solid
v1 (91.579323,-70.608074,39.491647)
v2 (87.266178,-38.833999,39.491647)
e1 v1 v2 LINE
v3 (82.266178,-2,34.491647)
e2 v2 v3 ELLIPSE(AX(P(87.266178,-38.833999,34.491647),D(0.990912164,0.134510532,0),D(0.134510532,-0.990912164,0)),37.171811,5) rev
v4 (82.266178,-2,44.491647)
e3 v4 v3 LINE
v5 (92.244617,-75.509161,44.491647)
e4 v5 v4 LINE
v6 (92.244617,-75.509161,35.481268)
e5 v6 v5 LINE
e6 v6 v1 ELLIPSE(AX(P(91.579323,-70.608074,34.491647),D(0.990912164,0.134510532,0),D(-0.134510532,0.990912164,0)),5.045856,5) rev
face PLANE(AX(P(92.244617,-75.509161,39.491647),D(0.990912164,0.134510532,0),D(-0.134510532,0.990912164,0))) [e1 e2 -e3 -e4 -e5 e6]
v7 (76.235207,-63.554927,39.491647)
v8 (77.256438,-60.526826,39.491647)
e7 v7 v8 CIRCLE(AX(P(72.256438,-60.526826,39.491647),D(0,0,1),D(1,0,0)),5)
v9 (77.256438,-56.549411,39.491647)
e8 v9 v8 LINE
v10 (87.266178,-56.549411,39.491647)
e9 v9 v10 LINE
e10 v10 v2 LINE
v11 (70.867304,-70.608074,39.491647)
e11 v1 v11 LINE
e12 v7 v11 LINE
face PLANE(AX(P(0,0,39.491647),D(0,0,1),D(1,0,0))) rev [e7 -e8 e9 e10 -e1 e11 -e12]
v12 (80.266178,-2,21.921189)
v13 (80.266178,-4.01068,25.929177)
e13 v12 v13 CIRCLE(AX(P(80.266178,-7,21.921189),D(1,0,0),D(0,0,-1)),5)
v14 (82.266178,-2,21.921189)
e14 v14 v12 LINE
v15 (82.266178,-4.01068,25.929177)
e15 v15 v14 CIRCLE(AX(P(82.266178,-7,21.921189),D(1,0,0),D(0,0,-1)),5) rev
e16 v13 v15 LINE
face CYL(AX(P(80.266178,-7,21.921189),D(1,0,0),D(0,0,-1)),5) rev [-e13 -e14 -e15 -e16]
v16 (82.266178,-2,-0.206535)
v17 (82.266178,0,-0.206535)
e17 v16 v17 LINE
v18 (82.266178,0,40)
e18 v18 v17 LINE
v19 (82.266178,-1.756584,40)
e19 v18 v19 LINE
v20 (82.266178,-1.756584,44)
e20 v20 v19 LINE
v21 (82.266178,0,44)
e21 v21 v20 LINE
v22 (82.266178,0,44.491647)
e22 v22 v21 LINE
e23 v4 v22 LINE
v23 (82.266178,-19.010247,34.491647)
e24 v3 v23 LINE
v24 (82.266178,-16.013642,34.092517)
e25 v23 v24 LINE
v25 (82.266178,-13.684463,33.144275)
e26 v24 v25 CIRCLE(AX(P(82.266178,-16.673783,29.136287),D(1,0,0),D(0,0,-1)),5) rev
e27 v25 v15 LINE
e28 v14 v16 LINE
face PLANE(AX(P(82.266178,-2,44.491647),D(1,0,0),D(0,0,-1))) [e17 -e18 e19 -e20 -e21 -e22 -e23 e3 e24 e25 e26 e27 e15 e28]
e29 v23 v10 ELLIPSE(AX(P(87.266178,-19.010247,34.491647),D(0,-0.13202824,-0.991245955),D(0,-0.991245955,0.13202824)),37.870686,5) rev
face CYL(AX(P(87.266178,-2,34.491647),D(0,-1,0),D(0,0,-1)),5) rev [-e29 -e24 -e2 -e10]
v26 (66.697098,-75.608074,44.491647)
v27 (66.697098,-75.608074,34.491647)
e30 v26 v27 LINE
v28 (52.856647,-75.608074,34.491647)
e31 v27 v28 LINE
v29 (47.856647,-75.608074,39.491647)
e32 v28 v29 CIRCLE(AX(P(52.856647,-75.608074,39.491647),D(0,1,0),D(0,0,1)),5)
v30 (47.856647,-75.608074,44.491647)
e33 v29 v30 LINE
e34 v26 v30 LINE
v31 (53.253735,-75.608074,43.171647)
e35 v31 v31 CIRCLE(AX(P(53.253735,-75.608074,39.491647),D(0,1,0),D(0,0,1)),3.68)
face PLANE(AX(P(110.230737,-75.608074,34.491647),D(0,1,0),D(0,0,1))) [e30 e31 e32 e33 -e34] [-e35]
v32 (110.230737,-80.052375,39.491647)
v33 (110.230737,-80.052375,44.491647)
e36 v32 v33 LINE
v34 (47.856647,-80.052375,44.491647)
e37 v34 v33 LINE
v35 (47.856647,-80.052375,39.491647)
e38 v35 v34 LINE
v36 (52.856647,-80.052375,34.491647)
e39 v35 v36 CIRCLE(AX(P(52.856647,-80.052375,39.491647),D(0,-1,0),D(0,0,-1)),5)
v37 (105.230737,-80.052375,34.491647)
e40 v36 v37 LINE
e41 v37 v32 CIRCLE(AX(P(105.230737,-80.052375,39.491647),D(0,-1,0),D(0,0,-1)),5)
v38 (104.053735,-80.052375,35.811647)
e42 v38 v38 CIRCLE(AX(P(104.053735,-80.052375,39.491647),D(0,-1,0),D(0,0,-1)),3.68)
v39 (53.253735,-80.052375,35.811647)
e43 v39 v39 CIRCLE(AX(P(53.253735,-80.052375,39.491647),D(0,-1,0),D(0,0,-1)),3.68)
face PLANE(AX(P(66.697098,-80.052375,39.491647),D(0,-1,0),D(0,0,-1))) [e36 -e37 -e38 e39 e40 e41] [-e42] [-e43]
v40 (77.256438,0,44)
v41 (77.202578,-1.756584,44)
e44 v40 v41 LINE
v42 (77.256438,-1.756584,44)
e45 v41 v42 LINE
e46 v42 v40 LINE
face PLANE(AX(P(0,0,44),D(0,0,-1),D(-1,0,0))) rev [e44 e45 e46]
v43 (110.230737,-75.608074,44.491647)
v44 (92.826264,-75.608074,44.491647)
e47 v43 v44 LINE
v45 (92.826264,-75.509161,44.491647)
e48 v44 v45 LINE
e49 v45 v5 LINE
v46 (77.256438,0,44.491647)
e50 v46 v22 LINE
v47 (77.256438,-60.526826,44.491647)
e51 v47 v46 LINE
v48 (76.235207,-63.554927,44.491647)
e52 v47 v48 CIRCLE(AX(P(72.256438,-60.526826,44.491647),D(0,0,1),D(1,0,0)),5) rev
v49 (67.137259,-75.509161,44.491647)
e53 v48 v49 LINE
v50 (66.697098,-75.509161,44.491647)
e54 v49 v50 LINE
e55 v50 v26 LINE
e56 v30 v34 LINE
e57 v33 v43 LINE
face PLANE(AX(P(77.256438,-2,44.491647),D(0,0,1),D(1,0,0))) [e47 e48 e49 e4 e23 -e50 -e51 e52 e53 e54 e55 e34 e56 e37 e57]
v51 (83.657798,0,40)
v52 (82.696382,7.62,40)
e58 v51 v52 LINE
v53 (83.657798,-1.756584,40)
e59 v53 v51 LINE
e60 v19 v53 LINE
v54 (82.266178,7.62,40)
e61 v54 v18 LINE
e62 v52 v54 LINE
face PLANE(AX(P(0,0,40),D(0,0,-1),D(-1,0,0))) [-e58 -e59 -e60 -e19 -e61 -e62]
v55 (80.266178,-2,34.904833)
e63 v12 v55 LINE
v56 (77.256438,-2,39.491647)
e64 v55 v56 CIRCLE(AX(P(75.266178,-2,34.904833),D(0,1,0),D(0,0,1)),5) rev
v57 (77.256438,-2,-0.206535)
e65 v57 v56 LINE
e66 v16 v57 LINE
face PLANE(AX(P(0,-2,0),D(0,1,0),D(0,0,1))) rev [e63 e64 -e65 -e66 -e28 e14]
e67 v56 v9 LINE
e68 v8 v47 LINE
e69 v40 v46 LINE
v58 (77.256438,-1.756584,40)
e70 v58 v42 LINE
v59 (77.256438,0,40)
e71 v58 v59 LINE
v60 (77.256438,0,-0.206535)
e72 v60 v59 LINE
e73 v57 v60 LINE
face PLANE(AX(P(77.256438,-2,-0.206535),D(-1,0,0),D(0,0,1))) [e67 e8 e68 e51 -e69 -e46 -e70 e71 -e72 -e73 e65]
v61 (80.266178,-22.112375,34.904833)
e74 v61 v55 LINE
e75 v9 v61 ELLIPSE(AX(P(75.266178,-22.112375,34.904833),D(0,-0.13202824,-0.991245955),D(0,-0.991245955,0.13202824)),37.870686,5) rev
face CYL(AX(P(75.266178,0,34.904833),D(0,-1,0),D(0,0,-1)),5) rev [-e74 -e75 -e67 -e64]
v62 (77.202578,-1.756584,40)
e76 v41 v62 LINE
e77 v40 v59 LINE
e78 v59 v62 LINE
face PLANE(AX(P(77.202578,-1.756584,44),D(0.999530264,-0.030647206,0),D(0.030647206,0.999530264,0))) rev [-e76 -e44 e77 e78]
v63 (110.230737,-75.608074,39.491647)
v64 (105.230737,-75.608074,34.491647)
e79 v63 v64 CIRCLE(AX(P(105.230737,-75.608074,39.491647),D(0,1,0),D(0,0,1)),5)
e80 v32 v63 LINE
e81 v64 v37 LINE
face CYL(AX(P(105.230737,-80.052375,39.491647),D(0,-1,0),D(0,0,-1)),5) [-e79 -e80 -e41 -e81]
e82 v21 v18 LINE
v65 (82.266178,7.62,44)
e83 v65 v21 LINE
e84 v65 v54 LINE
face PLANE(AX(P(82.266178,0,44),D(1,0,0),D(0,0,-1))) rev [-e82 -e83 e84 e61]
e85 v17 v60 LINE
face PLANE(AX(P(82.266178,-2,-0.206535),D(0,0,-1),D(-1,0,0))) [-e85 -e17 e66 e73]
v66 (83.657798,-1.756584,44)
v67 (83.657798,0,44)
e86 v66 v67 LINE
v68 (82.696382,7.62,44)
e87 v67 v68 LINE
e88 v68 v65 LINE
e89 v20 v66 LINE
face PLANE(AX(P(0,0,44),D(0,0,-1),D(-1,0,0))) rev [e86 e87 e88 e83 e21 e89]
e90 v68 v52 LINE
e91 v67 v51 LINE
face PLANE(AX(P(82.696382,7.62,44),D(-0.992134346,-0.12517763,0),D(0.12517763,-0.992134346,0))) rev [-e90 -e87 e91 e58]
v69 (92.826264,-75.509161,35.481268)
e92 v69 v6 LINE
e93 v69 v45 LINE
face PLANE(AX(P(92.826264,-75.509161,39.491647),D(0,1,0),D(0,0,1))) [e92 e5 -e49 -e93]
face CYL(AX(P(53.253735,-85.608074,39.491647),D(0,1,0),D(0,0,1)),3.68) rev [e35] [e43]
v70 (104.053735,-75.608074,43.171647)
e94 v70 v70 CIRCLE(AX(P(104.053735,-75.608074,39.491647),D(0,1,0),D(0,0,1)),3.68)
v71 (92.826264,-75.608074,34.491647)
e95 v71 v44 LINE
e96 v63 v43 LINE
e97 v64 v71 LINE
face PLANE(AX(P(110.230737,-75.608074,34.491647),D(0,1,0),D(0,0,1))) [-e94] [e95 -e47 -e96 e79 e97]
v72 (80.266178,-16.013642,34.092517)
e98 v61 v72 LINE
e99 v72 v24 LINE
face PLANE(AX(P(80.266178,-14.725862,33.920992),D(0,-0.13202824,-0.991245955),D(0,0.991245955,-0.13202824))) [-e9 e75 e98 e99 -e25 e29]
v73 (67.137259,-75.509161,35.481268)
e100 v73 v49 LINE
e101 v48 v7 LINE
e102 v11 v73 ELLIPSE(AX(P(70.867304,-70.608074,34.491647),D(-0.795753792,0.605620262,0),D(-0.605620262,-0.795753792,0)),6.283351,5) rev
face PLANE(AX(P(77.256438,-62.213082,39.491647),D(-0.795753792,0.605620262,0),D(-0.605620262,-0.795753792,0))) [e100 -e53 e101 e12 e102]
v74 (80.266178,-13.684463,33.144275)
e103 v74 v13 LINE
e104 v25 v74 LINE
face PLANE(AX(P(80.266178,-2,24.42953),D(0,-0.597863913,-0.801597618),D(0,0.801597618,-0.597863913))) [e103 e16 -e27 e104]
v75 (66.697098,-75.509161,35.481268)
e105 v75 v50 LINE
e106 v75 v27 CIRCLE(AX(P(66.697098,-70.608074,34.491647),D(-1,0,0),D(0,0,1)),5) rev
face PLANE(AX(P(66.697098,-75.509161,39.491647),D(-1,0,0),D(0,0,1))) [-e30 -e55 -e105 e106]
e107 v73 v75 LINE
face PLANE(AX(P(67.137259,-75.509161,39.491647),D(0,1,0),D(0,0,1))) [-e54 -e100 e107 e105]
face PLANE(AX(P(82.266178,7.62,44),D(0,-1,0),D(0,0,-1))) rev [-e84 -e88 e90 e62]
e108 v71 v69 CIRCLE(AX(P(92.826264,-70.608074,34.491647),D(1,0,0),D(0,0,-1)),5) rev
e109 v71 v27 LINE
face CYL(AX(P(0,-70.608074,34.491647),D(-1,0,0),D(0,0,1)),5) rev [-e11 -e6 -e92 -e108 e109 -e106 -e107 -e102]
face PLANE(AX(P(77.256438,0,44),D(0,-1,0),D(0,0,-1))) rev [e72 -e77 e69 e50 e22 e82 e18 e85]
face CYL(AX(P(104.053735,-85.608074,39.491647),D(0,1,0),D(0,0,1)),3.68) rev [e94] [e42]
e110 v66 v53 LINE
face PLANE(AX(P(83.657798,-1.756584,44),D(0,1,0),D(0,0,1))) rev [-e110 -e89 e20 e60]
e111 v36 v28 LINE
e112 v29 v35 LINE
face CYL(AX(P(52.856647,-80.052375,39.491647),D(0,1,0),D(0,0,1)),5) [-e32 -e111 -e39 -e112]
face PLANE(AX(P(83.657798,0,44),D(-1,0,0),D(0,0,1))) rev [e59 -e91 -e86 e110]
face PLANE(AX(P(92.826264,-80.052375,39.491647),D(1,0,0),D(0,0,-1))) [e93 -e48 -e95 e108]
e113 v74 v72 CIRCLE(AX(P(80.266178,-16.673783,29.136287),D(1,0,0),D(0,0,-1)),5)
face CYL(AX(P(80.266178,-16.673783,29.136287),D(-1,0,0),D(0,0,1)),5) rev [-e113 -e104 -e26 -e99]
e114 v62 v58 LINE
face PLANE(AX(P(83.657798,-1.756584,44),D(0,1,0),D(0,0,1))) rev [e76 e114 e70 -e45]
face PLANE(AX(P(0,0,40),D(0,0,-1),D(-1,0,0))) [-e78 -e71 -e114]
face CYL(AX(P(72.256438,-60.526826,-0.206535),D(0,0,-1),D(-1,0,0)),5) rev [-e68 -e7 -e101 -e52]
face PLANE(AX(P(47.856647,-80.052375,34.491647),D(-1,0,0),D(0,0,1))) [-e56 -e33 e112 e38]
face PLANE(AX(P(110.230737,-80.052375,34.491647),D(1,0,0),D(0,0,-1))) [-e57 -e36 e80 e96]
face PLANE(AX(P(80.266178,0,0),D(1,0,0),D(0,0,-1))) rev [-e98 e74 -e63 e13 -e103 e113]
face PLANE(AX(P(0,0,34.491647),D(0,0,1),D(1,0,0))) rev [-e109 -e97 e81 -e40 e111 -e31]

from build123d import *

# Parameters (mm, degrees)
BOSS_EXTRUDE3_START = 40
BOSS_EXTRUDE3_DEPTH = 4
SKETCH3_W           = 5.009740145
SKETCH3_H           = 44.698182912
BOSS_EXTRUDE4_DEPTH = 2
BOSS_EXTRUDE5_DEPTH = 5
SKETCH7_W           = 62.374089496
SKETCH7_H           = 4.444300198
BOSS_EXTRUDE6_DEPTH = 10
SKETCH8_R           = 3.68
CUT_EXTRUDE1_DEPTH  = 10
BOSS_EXTRUDE7_DEPTH = 2
FILLET1_R           = 5


with BuildPart() as part:
    # Sketch4 → Boss-Extrude3 (new body)
    with BuildSketch(Plane.XY.offset(BOSS_EXTRUDE3_START)):
        Polygon((82.266178214, 7.62), (82.696382378, 7.62), (83.657798078, 0), (83.657798078, -1.756584044), (77.202578377, -1.756584044), (77.256438069, 0), (82.266178214, 0), align=None)
    extrude(amount=BOSS_EXTRUDE3_DEPTH)

    # Sketch3 → Boss-Extrude4 (add)
    with BuildSketch(Plane(origin=(0, 0, 0), x_dir=(1, 0, 0), z_dir=(0, 1, 0))):
        with Locations((79.761308141, -22.142555967)):
            Rectangle(SKETCH3_W, SKETCH3_H)
    extrude(amount=-BOSS_EXTRUDE4_DEPTH)

    # Sketch6 → Boss-Extrude5 (add)
    with BuildSketch(Plane.XY.offset(44.491647423)):
        Polygon((77.256438069, -2), (77.256438069, -3.040359502), (77.256438069, -62.213081923), (67.137259184, -75.509161123), (66.697097711, -75.509161123), (66.697097711, -80.05237461), (92.826264311, -80.05237461), (92.826264311, -75.509161123), (92.244616978, -75.509161123), (82.266178214, -2), align=None)
    extrude(amount=-BOSS_EXTRUDE5_DEPTH)

    # Sketch7 → Boss-Extrude6 (add)
    with BuildSketch(Plane.XY.offset(44.491647423)):
        with Locations((79.043692129, -77.830224511)):
            Rectangle(SKETCH7_W, SKETCH7_H)
    extrude(amount=-BOSS_EXTRUDE6_DEPTH)

    # Sketch8 → Cut-Extrude1 (cut)
    with BuildSketch(Plane(origin=(0, -75.608074412, 0), x_dir=(1, 0, 0), z_dir=(0, 1, 0))):
        with Locations(Location((53.253735199, -39.491647423, 0), (0, 0, 270))):
            Circle(SKETCH8_R)
        with Locations(Location((104.053735199, -39.491647423, 0), (0, 0, 270))):
            Circle(SKETCH8_R)
    extrude(amount=-CUT_EXTRUDE1_DEPTH, mode=Mode.SUBTRACT)

    # Sketch9 → Boss-Extrude7 (add)
    with BuildSketch(Plane(origin=(82.266178214, 0, 0), x_dir=(0, 0, -1), z_dir=(1, 0, 0))):
        Polygon((-24.429530022, -2), (-33.920992071, -14.725861543), (-39.491647423, -56.549410739), (-39.491647423, -2), align=None)
    extrude(amount=-BOSS_EXTRUDE7_DEPTH)

    # Fillet1
    # the kernel refuses this fillet: 5 mm, written as the material it adds along each edge
    with BuildSketch(Plane(origin=(82.266178214, -69.049410739, 39.491647423), x_dir=(0, 0, -1), z_dir=(0, 1, 0))) as fillet1_piece_1_section:
        with BuildLine():
            CenterArc((FILLET1_R, -FILLET1_R), FILLET1_R, 90, 90)
            Line((0, -FILLET1_R), (0, 0))
            Line((0, 0), (FILLET1_R, 0))
        make_face()
    fillet1_piece_1 = extrude(amount=79.549410739, mode=Mode.PRIVATE)
    fillet1_piece_1 = split(fillet1_piece_1, bisect_by=Plane(origin=(91.203068258, -67.836280176, 39.491647423), z_dir=(-0.9909121640469413, -0.13451053172078273, 0)), keep=Keep.TOP, mode=Mode.PRIVATE)
    fillet1_piece_1 = split(fillet1_piece_1, bisect_by=Plane(origin=(82.266178214, -68.831517537, 41.127553158), z_dir=(0, 0.13202823988691362, 0.9912459552867612)), keep=Keep.TOP, mode=Mode.PRIVATE)
    add(fillet1_piece_1)
    with BuildSketch(Plane(origin=(82.266178214, -2, 24.429530022), x_dir=(0, 0, -1), z_dir=(-1, 0, 0))) as fillet1_piece_2:
        with BuildLine():
            CenterArc((FILLET1_R * 0.501668266059, FILLET1_R), FILLET1_R, 216.717064356, 53.282935644)
            Line((-FILLET1_R * 0.299929352407, FILLET1_R * 0.402136087333), (0, 0))
            Line((0, 0), (FILLET1_R * 0.501668266059, 0))
        make_face()
    extrude(amount=2)
    with BuildSketch(Plane(origin=(82.266178214, -14.725861543, 33.920992071), x_dir=(0, 0.8015976184662758, -0.5978639126667499), z_dir=(-1, 0, 0))) as fillet1_piece_3:
        with BuildLine():
            CenterArc((FILLET1_R * 0.259830628617, FILLET1_R), FILLET1_R, 240.869747944, 29.130252056)
            Line((-FILLET1_R * 0.226966033962, FILLET1_R * 0.126484682847), (0, 0))
            Line((0, 0), (FILLET1_R * 0.259830628617, 0))
        make_face()
    extrude(amount=2)
    with BuildSketch(Plane(origin=(80.266178214, -68.016446568, 39.491647423), x_dir=(-1, 0, 0), z_dir=(0, 1, 0))) as fillet1_piece_4_section:
        with BuildLine():
            CenterArc((5, -4.586814331), FILLET1_R, 113.456454131, 66.543545869)
            Line((0, -4.586814331), (0, 0))
            Line((0, 0), (3.009740145, 0))
        make_face()
    fillet1_piece_4 = extrude(amount=66.016446568, mode=Mode.PRIVATE)
    fillet1_piece_4 = split(fillet1_piece_4, bisect_by=Plane(origin=(80.266178214, -67.816559436, 40.992366597), z_dir=(0, 0.13202823988691362, 0.9912459552867612)), keep=Keep.TOP, mode=Mode.PRIVATE)
    add(fillet1_piece_4)
    with BuildSketch(Plane(origin=(77.256438069, -62.213081923, 44.491647423), x_dir=(0, 1, 0), z_dir=(0, 0, -1))) as fillet1_piece_5:
        with BuildLine():
            CenterArc((FILLET1_R * 0.337251278502, -FILLET1_R), FILLET1_R, 90, 37.273488701)
            Line((-FILLET1_R * 0.268368983809, -FILLET1_R * 0.204246207751), (0, 0))
            Line((0, 0), (FILLET1_R * 0.337251278502, 0))
        make_face()
    extrude(amount=5)
    with BuildSketch(Plane(origin=(66.697097711, -75.608074412, 39.491647423), x_dir=(0, 1, 0), z_dir=(1, 0, 0))) as fillet1_piece_6_section:
        with BuildLine():
            CenterArc((FILLET1_R, -FILLET1_R), FILLET1_R, 90, 90)
            Line((0, -FILLET1_R), (0, 0))
            Line((0, 0), (FILLET1_R, 0))
        make_face()
    fillet1_piece_6 = extrude(amount=26.1291666, mode=Mode.PRIVATE)
    fillet1_piece_6 = split(fillet1_piece_6, bisect_by=Plane(origin=(66.697097711, -75.509161123, 39.491647423), z_dir=(0, -1, 0)), keep=Keep.TOP, mode=Mode.PRIVATE)
    add(fillet1_piece_6)
    with BuildSketch(Plane(origin=(54.197097711, -75.608074412, 39.491647423), x_dir=(0, 1, 0), z_dir=(1, 0, 0))) as fillet1_piece_7_section:
        with BuildLine():
            CenterArc((FILLET1_R, -FILLET1_R), FILLET1_R, 90, 90)
            Line((0, -FILLET1_R), (0, 0))
            Line((0, 0), (FILLET1_R, 0))
        make_face()
    fillet1_piece_7 = extrude(amount=51.1291666, mode=Mode.PRIVATE)
    fillet1_piece_7 = split(fillet1_piece_7, bisect_by=Plane(origin=(91.569404015, -70.535002372, 39.491647423), z_dir=(-0.9909121640469413, -0.13451053172078273, 0)), keep=Keep.TOP, mode=Mode.PRIVATE)
    fillet1_piece_7 = split(fillet1_piece_7, bisect_by=Plane(origin=(62.343451037, -81.807977807, 39.491647423), z_dir=(0.7957537922487953, -0.6056202623110138, 0)), keep=Keep.TOP, mode=Mode.PRIVATE)
    add(fillet1_piece_7)
    # the kernel refuses this fillet: 5 mm, written as the material it takes off along each edge
    with BuildSketch(Plane(origin=(47.856647381, -92.55237461, 34.491647423), x_dir=(1, 0, 0), z_dir=(0, 1, 0))) as fillet1_2_piece_1:
        with BuildLine():
            CenterArc((FILLET1_R, -FILLET1_R), FILLET1_R, 90, 90)
            Line((0, -FILLET1_R), (0, 0))
            Line((0, 0), (FILLET1_R, 0))
        make_face()
    extrude(amount=29.444300198, mode=Mode.SUBTRACT)
    with BuildSketch(Plane(origin=(110.230736877, -63.108074412, 34.491647423), x_dir=(0, 0, 1), z_dir=(0, -1, 0))) as fillet1_2_piece_2:
        with BuildLine():
            CenterArc((FILLET1_R, FILLET1_R), FILLET1_R, 180, 90)
            Line((0, FILLET1_R), (0, 0))
            Line((0, 0), (FILLET1_R, 0))
        make_face()
    extrude(amount=29.444300198, mode=Mode.SUBTRACT)


solid = part.part
